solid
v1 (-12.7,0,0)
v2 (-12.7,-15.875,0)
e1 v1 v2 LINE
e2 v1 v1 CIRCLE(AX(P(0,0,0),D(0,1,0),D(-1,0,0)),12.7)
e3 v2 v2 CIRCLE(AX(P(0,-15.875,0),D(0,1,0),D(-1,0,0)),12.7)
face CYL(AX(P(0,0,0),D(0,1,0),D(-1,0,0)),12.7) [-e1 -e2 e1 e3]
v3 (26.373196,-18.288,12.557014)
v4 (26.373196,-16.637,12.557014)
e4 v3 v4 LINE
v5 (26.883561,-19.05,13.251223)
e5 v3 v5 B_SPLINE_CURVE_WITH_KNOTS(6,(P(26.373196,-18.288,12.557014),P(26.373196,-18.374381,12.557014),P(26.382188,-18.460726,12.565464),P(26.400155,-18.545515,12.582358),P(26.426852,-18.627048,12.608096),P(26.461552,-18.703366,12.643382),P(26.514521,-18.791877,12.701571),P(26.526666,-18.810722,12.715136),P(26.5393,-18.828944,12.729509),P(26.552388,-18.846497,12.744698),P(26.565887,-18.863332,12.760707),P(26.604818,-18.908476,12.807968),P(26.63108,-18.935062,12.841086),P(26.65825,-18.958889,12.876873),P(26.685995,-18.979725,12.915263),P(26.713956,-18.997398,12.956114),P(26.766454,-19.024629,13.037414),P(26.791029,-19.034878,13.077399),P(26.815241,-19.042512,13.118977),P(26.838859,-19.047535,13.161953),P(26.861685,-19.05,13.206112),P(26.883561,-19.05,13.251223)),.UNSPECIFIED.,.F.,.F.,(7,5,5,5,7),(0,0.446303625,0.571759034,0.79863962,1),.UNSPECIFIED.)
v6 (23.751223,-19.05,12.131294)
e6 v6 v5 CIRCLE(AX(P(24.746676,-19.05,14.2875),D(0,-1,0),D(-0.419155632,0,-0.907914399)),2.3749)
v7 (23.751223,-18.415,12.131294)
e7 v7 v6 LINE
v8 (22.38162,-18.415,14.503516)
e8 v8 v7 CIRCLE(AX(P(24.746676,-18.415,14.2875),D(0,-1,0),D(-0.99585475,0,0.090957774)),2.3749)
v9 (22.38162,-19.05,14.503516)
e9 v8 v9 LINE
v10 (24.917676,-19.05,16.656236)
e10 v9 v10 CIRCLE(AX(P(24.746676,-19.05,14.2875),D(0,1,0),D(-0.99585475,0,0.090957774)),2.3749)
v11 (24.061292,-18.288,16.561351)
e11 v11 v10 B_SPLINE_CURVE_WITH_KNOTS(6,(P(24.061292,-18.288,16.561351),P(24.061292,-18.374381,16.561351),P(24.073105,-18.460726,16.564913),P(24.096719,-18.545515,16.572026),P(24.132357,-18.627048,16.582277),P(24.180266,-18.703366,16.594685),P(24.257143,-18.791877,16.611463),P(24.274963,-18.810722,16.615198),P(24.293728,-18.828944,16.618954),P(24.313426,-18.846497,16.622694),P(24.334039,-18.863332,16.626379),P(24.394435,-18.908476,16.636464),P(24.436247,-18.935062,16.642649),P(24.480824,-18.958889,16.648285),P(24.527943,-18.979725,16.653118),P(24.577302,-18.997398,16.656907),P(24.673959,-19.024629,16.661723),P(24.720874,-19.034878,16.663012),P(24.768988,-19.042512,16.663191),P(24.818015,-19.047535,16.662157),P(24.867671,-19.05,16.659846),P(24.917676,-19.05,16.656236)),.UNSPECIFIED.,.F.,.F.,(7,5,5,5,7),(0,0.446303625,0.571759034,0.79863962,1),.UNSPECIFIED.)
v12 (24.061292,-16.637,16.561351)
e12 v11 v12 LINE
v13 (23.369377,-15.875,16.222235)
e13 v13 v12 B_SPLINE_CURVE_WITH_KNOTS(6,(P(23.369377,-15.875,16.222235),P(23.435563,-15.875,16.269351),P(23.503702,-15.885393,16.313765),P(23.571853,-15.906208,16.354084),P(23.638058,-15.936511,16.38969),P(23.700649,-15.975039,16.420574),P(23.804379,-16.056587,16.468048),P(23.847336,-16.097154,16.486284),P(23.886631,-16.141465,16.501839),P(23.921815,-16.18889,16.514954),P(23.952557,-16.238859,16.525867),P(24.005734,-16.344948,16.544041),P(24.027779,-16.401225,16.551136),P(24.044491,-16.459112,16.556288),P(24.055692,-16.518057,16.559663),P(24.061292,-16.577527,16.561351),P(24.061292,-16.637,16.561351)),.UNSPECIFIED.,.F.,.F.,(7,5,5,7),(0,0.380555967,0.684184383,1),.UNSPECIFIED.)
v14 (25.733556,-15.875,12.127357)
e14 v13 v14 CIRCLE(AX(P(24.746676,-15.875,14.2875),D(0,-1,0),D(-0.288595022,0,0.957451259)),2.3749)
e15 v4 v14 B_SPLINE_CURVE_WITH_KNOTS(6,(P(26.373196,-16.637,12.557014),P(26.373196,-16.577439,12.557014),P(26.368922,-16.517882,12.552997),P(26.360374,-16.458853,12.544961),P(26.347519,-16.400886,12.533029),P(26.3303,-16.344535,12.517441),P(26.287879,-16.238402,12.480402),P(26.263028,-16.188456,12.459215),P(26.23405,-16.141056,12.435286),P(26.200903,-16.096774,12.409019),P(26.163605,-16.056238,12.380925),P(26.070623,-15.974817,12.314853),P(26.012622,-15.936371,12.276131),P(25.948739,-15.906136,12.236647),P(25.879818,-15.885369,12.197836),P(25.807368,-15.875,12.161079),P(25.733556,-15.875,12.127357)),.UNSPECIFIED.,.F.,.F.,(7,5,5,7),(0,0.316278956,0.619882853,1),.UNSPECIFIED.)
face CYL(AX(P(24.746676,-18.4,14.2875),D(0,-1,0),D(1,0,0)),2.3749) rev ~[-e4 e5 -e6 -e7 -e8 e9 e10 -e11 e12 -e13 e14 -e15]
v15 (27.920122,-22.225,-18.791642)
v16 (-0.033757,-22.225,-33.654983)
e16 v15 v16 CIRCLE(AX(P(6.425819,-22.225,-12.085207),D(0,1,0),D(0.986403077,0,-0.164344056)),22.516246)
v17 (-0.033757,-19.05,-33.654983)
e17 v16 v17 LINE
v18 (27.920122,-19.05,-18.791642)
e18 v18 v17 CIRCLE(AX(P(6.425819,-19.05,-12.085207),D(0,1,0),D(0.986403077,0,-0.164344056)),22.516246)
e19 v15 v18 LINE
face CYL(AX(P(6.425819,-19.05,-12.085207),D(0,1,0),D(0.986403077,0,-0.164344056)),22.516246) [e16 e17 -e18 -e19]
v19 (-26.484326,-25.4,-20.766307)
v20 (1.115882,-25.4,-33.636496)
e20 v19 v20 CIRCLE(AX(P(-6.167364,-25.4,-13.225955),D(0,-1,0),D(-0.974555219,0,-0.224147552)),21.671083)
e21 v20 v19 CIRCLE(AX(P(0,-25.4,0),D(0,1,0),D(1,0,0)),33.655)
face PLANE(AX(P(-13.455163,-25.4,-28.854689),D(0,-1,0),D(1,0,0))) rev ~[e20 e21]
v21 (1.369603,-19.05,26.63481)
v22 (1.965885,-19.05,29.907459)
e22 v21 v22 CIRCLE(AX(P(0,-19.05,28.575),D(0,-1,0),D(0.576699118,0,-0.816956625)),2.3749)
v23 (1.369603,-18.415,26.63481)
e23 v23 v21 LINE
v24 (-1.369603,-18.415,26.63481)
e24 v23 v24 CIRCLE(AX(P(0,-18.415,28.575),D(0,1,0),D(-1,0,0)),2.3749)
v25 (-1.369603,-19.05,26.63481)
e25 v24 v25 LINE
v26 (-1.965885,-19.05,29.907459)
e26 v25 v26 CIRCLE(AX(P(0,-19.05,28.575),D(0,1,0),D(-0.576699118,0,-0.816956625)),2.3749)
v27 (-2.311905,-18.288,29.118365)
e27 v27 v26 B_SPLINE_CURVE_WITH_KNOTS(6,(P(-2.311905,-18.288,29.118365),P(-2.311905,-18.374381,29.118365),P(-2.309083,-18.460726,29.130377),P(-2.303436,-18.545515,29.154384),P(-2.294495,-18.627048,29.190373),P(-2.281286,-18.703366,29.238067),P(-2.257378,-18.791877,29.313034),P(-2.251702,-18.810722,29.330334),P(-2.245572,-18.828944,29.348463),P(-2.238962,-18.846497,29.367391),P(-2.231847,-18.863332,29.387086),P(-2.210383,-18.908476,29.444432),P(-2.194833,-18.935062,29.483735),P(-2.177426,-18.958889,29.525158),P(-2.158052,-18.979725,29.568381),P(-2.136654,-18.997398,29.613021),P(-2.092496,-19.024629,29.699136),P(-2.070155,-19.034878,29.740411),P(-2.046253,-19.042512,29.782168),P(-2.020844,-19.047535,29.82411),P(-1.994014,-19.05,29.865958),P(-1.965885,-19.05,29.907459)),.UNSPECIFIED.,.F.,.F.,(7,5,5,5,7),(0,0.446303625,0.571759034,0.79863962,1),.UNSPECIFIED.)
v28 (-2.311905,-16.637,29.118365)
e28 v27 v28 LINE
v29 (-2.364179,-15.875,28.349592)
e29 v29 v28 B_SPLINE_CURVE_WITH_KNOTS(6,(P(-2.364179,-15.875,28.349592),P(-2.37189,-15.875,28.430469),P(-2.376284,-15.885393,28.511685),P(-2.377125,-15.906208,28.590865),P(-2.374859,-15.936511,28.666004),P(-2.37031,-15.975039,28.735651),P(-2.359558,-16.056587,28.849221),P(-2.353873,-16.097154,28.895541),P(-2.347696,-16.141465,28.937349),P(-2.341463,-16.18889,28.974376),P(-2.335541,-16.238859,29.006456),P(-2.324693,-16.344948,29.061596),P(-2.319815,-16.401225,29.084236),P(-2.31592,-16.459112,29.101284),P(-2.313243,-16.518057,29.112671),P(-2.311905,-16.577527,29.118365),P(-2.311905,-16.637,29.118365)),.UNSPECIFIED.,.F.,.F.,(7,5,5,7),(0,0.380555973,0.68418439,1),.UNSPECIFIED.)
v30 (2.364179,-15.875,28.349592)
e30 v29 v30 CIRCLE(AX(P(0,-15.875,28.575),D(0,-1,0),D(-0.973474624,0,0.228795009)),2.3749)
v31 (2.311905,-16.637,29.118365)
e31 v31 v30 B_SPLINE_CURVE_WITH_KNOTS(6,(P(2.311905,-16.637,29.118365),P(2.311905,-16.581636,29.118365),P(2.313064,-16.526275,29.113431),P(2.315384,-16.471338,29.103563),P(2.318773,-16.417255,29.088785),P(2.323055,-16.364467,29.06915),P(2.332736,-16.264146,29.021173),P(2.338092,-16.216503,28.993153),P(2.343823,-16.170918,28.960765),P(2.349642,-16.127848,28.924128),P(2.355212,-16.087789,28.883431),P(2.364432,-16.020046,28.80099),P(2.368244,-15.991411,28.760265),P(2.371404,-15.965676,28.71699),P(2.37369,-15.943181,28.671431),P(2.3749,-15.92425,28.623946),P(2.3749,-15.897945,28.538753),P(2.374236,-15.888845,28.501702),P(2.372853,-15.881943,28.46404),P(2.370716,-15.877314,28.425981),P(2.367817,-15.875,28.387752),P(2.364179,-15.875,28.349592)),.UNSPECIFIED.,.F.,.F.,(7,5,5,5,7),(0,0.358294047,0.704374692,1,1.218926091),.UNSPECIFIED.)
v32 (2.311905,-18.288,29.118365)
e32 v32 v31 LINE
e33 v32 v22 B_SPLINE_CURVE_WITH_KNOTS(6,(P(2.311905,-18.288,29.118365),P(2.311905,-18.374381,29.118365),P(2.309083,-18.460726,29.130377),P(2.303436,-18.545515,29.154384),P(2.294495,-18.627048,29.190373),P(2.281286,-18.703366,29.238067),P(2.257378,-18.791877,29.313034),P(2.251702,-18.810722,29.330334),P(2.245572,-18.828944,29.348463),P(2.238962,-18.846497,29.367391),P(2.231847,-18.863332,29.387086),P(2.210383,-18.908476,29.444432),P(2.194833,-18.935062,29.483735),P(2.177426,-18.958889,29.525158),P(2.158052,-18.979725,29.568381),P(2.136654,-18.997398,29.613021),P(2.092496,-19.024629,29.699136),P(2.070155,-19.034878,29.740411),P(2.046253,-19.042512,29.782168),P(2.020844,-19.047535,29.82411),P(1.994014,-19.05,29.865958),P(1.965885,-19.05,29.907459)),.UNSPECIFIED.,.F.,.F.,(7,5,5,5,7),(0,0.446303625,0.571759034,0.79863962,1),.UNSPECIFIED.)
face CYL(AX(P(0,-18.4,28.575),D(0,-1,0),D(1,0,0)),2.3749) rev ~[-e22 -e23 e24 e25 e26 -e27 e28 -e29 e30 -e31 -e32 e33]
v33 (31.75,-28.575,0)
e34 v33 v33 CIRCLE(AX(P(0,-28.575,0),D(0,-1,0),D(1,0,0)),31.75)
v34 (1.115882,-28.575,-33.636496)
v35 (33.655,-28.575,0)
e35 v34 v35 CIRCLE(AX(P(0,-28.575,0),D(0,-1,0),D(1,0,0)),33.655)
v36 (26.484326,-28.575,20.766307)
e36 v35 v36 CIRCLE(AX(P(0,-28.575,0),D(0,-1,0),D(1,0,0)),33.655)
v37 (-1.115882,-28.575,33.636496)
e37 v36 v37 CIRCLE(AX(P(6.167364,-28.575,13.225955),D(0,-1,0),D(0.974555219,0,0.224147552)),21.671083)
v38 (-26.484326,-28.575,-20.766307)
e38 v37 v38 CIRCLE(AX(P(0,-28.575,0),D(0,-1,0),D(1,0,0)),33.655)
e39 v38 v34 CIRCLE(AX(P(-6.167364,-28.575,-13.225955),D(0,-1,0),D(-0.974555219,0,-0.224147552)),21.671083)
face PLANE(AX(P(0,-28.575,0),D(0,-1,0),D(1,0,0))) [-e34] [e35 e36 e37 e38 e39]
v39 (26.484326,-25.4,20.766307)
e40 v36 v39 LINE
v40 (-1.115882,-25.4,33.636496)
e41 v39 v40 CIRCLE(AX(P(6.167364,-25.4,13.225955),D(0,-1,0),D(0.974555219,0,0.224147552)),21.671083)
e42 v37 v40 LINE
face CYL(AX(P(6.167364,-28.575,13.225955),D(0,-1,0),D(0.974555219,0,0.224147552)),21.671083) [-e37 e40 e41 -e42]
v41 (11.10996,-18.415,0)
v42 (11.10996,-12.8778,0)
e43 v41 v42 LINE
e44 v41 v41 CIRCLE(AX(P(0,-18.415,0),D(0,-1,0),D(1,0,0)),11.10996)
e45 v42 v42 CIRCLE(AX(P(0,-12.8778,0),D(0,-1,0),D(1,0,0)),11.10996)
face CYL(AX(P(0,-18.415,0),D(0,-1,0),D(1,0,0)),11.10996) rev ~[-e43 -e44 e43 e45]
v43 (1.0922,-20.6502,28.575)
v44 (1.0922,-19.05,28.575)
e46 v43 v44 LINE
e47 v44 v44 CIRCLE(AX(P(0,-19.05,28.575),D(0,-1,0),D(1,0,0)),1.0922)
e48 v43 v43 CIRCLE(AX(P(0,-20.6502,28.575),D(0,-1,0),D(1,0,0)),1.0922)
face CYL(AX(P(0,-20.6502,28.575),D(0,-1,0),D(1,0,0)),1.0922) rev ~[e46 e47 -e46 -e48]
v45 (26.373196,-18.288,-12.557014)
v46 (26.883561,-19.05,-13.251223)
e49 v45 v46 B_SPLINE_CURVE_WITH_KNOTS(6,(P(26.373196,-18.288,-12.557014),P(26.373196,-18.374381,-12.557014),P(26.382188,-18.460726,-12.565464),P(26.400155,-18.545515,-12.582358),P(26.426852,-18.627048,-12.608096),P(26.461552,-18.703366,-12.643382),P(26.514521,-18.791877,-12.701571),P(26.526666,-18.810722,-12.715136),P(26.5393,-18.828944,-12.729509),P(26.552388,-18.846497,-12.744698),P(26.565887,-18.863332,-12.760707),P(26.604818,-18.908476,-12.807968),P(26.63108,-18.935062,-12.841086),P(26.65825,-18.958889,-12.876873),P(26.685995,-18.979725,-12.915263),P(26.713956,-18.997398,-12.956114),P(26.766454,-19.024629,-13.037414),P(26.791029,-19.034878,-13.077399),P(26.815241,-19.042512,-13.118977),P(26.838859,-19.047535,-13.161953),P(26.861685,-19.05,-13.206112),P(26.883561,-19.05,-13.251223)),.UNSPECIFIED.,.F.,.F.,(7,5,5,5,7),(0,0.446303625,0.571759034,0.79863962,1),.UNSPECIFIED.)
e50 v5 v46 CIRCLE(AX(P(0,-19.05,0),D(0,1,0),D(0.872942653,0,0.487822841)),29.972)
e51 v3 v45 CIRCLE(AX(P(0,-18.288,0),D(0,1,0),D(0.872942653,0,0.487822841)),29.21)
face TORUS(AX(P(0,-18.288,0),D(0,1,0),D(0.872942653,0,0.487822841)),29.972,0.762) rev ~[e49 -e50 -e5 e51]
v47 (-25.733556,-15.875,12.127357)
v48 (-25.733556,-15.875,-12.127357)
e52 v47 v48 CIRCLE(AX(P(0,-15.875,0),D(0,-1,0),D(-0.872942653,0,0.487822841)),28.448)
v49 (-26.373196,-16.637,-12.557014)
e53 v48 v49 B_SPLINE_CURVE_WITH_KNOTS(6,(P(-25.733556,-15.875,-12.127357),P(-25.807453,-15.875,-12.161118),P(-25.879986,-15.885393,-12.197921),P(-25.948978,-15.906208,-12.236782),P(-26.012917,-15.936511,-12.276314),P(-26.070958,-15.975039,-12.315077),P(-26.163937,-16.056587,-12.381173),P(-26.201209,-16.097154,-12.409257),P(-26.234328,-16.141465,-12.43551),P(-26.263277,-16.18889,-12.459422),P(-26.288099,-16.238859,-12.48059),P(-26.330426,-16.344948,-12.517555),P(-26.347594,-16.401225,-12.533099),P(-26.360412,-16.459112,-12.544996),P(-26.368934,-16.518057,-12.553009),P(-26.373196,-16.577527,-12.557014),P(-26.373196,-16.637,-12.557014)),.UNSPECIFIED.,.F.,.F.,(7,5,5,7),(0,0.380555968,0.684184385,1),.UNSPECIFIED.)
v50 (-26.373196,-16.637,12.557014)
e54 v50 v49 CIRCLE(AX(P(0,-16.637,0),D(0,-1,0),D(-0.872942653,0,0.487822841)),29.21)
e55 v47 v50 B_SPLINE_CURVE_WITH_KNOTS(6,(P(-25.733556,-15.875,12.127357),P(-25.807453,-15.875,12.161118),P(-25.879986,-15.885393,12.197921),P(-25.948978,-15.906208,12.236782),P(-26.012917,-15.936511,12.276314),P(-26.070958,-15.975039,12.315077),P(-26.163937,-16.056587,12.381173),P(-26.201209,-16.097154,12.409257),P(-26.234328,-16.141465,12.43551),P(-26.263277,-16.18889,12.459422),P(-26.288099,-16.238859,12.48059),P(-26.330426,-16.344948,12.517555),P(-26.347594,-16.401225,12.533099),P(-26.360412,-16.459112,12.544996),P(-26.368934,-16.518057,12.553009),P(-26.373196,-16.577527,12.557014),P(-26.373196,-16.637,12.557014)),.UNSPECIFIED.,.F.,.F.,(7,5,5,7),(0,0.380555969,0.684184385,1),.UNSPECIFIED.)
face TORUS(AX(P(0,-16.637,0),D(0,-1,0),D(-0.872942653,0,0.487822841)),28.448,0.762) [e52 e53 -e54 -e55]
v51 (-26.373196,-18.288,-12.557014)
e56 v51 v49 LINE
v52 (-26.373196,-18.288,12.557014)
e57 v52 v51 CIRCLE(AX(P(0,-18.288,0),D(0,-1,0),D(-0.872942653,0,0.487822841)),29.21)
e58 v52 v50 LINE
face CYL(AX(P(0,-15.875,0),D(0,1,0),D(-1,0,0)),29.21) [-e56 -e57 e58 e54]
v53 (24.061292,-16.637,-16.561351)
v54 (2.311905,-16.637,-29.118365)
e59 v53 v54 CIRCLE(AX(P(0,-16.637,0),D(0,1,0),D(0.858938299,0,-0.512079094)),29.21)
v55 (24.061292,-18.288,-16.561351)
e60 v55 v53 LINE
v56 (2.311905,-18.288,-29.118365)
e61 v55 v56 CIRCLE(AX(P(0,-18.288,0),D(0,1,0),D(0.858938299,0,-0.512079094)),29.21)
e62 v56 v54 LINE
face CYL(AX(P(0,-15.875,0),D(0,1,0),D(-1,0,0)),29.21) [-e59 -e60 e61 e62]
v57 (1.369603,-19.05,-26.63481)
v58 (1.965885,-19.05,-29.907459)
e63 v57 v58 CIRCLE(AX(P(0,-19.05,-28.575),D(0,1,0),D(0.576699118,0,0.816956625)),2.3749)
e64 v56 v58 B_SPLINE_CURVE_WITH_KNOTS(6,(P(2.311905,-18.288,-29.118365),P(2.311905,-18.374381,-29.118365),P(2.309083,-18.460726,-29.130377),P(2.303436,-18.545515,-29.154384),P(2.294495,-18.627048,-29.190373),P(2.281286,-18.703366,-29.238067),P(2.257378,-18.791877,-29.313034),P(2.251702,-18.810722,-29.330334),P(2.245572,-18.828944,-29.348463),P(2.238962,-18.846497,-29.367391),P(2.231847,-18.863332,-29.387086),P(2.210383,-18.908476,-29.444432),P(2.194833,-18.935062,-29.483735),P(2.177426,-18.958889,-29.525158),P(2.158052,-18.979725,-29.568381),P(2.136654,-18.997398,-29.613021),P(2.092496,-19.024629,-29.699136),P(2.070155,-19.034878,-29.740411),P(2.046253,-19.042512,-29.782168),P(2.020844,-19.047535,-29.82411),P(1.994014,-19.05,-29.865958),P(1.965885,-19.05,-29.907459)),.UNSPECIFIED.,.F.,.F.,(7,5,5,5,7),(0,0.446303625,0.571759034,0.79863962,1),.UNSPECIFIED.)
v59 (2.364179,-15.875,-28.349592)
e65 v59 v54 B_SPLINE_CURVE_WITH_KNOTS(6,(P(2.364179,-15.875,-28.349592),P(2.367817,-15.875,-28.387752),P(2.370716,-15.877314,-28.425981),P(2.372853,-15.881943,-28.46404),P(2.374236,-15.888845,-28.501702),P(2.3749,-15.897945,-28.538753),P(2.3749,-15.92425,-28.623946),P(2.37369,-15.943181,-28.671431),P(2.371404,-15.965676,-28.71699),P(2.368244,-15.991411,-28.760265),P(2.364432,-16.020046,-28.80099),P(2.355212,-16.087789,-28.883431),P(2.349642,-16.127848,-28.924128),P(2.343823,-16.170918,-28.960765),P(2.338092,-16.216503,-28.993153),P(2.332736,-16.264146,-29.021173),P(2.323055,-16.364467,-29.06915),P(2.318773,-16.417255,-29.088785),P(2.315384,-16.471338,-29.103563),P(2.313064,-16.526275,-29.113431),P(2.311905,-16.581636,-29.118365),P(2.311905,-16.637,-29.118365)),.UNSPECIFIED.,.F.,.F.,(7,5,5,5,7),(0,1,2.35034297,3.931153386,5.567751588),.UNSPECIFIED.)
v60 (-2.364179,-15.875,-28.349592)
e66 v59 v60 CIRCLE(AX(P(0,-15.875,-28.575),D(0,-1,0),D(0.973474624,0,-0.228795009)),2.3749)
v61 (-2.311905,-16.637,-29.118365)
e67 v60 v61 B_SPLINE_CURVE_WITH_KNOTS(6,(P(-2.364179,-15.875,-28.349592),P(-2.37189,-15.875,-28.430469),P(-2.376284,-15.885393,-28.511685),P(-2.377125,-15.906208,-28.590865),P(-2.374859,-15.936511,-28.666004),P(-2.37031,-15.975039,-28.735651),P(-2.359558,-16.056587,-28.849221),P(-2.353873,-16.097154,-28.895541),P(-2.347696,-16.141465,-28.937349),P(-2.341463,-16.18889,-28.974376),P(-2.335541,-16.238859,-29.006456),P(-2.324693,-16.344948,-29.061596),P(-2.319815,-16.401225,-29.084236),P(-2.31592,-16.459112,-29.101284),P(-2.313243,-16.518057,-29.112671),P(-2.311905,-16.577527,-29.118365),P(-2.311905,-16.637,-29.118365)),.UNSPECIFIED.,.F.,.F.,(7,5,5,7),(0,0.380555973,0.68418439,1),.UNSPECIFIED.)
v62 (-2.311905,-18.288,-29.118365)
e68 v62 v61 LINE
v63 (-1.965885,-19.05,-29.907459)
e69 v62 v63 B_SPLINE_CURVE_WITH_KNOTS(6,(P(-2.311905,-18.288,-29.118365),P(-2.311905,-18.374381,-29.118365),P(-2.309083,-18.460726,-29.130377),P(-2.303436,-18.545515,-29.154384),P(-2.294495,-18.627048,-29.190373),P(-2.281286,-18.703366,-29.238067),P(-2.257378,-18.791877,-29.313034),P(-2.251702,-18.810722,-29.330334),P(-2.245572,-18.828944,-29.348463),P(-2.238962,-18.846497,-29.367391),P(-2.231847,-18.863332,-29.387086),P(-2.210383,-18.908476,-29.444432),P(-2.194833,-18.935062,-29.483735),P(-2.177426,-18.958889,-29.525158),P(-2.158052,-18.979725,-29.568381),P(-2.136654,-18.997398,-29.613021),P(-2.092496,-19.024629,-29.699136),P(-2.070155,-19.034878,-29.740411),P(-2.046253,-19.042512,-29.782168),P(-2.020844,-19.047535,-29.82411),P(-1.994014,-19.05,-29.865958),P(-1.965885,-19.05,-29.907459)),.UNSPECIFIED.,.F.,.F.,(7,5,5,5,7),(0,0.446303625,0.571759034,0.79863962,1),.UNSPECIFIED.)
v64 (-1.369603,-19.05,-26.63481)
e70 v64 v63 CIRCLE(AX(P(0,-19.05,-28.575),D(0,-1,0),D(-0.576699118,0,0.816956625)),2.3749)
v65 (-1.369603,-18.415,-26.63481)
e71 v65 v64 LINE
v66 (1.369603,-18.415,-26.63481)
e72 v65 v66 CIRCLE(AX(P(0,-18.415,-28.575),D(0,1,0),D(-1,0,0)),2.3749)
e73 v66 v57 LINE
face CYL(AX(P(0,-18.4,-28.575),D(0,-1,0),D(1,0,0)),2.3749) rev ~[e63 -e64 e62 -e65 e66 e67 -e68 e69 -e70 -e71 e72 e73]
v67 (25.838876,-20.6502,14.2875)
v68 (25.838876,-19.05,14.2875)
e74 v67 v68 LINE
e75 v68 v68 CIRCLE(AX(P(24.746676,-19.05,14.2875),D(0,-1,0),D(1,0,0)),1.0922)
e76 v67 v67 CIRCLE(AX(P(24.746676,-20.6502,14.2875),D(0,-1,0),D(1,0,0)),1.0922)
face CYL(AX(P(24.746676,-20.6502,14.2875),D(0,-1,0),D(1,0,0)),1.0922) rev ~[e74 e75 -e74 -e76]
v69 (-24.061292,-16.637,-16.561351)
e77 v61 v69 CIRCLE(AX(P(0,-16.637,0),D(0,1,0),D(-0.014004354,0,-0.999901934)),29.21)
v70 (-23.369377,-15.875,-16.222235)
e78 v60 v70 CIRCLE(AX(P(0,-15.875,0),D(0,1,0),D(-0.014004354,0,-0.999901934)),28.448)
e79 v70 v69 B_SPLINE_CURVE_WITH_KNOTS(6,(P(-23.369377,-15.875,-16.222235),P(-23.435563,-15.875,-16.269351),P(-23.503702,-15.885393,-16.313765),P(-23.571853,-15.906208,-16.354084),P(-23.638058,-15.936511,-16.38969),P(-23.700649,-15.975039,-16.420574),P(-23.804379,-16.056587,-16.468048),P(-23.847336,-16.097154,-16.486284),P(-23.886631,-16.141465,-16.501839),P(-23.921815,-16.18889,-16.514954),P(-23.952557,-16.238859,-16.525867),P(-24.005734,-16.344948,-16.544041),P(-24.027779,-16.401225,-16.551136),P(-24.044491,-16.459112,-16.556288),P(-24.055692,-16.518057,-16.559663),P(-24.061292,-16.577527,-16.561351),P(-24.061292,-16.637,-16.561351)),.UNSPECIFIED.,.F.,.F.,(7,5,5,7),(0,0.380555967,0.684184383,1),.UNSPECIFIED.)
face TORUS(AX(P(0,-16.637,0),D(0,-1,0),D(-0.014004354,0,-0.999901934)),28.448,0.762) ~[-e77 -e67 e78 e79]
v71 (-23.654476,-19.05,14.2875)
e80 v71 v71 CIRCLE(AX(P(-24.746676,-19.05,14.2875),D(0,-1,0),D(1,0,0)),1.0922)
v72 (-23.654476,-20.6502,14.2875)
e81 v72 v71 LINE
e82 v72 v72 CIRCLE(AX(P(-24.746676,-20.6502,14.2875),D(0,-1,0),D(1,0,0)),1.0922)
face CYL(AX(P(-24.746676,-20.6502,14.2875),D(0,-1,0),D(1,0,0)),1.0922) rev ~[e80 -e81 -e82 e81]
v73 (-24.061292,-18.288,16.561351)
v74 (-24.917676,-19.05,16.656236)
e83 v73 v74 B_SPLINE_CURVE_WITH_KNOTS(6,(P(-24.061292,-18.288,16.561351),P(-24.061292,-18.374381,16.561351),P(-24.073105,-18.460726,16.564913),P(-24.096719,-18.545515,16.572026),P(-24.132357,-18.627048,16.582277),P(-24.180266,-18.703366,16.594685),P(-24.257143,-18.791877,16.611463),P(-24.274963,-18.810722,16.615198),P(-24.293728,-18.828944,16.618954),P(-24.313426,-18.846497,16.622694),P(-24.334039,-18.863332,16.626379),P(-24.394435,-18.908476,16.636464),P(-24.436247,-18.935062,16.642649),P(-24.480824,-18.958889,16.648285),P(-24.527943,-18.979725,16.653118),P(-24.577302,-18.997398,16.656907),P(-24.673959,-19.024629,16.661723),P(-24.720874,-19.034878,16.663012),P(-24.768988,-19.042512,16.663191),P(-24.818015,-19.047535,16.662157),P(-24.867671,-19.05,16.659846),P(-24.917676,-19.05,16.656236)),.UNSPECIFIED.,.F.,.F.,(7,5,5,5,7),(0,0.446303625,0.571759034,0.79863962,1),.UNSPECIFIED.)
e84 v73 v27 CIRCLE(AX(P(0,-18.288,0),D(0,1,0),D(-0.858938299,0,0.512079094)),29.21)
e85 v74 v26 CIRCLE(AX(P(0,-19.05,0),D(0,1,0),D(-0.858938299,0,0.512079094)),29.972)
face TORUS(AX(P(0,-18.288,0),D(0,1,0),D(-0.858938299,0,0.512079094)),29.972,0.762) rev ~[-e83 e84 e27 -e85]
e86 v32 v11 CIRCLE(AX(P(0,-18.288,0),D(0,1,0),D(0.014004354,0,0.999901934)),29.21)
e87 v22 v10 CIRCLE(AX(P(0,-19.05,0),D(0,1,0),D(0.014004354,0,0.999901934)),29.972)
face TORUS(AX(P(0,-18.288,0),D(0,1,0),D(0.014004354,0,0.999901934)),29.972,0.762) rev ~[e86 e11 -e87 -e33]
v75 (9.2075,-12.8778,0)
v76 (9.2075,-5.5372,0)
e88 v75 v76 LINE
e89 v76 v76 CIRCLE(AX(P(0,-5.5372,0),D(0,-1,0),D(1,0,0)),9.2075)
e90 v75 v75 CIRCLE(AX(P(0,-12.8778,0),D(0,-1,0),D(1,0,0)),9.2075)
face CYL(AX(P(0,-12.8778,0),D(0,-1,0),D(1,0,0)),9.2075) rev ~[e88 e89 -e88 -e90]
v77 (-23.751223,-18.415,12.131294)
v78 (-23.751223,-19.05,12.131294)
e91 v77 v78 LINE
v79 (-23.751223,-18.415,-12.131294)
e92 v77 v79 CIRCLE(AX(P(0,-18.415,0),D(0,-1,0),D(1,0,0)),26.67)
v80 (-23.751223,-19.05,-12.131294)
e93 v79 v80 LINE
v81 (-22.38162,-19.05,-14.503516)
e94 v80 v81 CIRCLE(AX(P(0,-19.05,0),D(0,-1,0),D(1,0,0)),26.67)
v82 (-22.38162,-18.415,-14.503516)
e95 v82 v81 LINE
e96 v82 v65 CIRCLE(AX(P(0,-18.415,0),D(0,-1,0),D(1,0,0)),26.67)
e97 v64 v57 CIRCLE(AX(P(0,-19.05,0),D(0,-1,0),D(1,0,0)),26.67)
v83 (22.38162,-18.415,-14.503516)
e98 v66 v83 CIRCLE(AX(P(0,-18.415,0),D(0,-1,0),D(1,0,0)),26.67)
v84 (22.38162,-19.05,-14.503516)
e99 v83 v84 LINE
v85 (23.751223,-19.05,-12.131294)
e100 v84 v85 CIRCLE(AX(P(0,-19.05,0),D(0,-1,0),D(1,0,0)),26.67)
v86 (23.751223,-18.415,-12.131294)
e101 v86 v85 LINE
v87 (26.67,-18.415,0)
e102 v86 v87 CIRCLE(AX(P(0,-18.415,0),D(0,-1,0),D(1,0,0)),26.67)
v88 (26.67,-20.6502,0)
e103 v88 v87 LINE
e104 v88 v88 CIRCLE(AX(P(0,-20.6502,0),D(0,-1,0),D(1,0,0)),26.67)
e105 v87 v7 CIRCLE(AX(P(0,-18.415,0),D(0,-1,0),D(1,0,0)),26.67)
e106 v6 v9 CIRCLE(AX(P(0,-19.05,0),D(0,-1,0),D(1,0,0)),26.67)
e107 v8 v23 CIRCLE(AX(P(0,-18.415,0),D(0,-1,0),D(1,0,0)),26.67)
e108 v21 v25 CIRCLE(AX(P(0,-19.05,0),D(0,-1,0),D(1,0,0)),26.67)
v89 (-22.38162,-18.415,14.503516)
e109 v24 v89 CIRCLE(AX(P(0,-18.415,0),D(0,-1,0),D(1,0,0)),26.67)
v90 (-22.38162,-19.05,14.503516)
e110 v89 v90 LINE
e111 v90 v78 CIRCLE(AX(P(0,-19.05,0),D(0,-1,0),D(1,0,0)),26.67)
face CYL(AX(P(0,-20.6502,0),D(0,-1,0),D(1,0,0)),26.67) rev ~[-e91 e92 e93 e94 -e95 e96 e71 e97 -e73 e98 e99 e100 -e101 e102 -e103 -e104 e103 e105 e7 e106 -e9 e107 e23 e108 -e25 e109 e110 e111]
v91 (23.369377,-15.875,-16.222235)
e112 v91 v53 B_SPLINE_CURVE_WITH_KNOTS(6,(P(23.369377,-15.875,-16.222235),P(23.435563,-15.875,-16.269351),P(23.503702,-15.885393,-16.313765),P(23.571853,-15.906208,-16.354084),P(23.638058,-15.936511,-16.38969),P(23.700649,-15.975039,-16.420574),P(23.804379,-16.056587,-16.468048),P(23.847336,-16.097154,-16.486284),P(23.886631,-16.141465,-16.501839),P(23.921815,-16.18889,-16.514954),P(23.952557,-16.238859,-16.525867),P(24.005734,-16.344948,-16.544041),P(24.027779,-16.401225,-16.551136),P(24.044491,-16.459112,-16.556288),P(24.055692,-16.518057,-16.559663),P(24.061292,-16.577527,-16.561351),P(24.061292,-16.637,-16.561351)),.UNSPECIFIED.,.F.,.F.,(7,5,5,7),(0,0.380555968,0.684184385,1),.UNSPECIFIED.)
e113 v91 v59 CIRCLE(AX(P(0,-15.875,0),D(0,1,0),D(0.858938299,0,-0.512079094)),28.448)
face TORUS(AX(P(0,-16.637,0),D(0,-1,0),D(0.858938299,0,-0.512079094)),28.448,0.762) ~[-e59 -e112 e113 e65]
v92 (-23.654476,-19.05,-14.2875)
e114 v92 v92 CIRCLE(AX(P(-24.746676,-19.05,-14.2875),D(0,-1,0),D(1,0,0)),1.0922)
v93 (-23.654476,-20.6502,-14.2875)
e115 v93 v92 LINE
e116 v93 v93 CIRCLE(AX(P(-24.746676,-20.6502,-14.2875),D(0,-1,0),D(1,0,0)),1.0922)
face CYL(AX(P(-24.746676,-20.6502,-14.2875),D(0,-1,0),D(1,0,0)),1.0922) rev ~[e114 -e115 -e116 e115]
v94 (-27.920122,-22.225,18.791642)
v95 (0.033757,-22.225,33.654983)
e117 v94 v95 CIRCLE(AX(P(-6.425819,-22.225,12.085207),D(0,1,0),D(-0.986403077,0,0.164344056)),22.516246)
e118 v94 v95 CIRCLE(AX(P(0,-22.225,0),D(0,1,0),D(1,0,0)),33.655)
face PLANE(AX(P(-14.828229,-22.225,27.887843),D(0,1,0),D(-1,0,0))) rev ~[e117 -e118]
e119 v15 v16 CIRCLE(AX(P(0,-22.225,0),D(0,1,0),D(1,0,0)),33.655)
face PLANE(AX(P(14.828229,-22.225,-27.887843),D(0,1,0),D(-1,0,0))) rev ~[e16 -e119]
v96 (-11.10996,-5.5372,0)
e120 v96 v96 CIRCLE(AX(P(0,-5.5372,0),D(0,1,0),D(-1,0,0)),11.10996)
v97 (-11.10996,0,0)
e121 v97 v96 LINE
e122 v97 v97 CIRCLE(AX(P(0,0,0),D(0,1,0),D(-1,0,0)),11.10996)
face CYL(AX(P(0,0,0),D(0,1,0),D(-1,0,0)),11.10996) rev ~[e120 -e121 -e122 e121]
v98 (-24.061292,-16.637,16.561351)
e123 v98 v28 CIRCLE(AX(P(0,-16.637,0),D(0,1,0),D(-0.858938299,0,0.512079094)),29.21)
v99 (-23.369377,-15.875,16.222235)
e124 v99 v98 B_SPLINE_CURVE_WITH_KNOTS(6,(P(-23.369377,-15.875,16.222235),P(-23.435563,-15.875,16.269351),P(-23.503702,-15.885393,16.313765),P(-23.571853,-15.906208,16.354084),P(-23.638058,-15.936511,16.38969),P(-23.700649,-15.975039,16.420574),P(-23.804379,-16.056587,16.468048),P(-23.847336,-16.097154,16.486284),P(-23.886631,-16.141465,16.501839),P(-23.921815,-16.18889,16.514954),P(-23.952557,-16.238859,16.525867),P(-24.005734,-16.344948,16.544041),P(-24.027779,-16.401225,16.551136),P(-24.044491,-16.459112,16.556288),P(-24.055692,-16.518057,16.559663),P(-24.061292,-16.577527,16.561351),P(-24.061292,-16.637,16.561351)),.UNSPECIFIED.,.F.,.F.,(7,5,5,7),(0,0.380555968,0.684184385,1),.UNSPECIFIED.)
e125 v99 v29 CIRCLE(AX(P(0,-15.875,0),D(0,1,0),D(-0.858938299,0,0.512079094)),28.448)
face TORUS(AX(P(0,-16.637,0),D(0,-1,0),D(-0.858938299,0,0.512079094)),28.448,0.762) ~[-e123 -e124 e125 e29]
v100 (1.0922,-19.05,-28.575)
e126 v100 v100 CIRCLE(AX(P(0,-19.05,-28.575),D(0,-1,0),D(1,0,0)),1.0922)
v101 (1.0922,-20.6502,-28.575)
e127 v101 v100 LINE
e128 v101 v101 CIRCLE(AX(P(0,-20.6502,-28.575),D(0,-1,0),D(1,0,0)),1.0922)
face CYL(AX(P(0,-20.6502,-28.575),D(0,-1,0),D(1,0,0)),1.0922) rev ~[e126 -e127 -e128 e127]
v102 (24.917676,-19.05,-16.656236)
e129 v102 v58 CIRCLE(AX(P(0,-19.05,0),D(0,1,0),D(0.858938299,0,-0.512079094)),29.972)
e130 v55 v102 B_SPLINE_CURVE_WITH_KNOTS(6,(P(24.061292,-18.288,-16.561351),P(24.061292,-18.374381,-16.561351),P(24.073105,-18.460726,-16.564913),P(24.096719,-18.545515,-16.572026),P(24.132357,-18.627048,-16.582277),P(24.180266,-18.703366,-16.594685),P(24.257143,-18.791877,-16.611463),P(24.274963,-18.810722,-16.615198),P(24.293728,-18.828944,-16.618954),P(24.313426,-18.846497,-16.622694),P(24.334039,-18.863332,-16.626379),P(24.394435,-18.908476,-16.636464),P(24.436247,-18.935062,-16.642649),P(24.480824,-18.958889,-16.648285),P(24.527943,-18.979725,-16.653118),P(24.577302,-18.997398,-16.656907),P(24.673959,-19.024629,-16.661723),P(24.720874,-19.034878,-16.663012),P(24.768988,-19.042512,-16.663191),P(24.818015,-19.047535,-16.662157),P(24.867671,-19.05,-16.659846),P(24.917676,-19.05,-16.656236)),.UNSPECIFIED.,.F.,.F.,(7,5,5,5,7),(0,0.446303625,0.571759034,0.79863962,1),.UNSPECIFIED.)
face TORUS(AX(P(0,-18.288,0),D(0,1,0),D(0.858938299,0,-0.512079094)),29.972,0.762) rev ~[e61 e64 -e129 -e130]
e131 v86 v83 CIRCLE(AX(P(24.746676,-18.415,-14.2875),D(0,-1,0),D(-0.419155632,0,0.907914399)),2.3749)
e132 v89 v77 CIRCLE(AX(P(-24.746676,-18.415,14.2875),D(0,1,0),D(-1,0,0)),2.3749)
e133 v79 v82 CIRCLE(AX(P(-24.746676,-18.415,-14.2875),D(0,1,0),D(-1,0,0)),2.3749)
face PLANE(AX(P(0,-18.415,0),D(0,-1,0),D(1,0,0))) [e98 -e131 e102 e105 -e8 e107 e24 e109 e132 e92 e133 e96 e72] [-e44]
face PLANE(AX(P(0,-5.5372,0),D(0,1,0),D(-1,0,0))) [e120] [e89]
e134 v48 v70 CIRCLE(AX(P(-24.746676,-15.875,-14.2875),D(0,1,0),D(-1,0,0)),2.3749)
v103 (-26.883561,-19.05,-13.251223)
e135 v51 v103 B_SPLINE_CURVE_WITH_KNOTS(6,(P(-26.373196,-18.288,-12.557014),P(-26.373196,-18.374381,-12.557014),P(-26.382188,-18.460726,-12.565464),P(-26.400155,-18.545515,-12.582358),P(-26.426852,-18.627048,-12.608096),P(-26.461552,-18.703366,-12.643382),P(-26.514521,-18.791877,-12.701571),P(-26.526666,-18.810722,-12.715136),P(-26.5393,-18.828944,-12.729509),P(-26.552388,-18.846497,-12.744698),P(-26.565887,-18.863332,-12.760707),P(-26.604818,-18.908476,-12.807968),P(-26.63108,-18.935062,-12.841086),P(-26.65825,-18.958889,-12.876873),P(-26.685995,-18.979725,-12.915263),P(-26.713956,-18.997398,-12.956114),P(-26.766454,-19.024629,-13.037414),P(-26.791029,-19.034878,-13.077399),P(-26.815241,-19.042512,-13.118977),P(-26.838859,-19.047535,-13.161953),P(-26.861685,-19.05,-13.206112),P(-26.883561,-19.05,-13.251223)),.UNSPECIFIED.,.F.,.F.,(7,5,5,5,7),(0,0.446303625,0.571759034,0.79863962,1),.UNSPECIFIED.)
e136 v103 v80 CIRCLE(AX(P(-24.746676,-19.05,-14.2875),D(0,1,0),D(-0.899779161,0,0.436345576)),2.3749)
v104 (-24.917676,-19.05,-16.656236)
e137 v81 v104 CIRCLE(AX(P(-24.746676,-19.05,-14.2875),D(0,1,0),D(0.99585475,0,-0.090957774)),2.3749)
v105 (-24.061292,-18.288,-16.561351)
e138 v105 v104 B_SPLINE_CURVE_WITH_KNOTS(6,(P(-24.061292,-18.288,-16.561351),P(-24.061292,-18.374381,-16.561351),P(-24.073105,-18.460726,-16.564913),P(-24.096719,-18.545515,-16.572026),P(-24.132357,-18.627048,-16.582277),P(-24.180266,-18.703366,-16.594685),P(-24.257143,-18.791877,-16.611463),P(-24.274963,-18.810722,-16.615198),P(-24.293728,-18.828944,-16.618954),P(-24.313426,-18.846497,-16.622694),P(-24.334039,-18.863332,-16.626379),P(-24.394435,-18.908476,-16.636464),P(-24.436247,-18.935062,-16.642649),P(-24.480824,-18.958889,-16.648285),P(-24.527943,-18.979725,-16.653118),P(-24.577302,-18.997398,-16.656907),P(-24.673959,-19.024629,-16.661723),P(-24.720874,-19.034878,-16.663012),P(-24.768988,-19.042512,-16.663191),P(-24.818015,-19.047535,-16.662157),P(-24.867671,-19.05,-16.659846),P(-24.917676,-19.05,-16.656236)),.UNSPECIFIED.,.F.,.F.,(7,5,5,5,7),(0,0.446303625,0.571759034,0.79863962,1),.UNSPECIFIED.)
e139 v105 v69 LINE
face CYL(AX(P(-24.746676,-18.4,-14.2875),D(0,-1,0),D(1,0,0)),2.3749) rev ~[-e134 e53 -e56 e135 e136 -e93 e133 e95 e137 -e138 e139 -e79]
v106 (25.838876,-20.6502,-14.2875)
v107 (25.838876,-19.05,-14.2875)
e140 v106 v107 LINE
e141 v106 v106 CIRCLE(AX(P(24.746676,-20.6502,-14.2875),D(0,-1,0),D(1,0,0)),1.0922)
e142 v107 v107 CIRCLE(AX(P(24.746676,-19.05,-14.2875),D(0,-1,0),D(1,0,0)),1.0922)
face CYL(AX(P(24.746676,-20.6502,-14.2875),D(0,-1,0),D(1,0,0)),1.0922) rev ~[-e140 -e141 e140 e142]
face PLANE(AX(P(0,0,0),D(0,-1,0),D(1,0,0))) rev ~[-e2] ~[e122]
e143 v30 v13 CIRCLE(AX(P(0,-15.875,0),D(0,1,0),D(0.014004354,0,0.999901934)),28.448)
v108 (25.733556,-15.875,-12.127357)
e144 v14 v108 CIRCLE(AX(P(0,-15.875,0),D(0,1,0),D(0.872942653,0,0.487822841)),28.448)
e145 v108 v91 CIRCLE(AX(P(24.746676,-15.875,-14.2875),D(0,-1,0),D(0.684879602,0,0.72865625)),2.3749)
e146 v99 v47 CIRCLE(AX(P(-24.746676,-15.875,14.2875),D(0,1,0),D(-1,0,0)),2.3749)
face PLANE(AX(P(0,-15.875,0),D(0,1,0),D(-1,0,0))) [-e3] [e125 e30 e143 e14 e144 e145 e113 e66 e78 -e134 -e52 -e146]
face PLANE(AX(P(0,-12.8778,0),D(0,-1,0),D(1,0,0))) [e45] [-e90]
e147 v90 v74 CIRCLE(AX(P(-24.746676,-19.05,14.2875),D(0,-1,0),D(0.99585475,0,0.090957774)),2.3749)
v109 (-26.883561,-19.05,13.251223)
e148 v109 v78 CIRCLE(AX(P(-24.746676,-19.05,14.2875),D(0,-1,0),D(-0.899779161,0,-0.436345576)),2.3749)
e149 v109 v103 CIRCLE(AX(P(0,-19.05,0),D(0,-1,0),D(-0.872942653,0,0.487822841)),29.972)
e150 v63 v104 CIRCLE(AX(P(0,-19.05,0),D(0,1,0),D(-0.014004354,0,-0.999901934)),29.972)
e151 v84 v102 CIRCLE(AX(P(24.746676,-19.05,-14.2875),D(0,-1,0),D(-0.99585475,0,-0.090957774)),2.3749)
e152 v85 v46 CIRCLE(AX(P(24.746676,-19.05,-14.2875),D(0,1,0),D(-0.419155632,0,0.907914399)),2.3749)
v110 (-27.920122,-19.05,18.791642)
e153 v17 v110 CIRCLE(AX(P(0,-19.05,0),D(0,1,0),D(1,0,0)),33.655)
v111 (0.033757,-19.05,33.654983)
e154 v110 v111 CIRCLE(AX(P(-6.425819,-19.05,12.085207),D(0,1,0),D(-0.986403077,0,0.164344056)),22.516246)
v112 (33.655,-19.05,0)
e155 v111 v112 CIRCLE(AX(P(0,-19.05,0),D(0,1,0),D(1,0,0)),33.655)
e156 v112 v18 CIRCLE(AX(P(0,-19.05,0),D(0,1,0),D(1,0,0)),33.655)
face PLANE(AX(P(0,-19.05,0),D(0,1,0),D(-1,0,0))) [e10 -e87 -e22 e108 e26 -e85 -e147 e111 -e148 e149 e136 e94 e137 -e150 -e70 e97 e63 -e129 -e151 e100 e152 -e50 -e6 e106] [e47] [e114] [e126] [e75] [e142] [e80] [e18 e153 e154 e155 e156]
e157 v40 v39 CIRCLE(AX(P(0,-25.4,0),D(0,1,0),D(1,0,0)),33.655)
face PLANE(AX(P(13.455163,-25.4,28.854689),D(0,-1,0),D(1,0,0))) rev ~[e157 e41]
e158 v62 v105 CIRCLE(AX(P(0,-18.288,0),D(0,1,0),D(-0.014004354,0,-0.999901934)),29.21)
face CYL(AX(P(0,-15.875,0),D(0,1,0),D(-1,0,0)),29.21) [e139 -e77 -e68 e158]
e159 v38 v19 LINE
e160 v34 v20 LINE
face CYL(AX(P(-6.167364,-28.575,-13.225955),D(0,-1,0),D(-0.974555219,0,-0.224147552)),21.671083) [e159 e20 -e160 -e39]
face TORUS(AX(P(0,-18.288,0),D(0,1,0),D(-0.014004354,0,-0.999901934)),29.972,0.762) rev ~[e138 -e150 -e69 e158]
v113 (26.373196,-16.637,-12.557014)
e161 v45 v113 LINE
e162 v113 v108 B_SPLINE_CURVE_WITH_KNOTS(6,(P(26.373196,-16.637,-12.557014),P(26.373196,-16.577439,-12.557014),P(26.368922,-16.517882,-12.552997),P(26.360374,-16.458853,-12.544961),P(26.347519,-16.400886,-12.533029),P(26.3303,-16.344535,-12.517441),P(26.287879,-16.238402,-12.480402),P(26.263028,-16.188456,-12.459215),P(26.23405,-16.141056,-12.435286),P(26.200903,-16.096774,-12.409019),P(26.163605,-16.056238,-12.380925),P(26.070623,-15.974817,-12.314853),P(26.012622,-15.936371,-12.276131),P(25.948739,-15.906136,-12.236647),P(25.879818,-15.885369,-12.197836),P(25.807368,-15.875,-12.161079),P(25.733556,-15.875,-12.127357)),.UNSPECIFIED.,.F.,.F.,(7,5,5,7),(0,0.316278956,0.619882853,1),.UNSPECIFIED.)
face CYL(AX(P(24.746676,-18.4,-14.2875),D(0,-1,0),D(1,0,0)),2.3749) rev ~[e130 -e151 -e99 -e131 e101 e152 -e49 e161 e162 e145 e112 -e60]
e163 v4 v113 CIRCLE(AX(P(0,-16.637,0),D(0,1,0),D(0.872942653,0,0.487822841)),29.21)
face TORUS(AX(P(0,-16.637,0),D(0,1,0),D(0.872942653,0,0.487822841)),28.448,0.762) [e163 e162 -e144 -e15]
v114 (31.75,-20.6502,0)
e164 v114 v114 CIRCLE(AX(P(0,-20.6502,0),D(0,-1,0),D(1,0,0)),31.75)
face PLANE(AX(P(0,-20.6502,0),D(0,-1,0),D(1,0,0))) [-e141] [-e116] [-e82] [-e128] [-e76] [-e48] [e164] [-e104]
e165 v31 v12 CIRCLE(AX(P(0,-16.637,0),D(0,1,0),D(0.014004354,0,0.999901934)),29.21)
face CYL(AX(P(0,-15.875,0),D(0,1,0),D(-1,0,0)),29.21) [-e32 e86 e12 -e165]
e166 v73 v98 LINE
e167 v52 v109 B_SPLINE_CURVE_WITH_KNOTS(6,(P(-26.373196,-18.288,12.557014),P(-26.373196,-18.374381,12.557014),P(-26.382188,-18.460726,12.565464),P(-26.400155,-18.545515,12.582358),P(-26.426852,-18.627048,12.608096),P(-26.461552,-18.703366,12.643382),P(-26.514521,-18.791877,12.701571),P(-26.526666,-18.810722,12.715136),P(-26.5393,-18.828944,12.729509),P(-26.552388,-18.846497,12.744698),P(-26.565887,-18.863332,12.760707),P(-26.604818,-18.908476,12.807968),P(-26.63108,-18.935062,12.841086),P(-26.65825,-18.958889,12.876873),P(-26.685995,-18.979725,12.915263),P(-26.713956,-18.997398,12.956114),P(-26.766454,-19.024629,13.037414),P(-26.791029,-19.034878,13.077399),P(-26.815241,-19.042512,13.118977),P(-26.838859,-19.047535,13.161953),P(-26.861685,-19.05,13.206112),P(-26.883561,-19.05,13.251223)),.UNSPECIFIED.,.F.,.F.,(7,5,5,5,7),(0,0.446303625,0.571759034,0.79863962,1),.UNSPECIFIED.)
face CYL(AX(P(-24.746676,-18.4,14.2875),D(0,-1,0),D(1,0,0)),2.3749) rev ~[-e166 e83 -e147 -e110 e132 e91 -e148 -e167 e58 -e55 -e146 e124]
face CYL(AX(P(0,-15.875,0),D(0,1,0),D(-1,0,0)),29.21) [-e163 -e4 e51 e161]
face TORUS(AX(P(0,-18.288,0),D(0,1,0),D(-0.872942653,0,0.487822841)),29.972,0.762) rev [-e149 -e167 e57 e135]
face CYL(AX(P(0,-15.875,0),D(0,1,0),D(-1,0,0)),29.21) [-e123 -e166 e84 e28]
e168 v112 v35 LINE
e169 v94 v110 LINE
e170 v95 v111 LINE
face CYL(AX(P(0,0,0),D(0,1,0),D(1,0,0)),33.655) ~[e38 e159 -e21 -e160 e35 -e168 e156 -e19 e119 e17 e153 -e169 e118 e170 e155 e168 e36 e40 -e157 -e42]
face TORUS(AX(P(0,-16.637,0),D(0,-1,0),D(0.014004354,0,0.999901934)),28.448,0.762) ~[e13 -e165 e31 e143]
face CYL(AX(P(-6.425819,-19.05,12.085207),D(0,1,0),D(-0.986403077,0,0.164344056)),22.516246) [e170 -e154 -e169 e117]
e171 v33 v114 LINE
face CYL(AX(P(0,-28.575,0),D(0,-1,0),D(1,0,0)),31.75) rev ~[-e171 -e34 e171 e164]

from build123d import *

# Parameters (mm, degrees)
F0_R          = 33.655
F1_DEPTH      = 28.575
F2_R          = 43.8466719597
F2_R_2        = 12.7
F3_DEPTH      = 15.875
F4_R          = 31.75
F5_DEPTH      = 7.9248
F6_R          = 26.67
F7_DEPTH      = 2.2352
F8_R          = 11.10996
F9_DEPTH      = 5.5372
F10_R         = 9.2075
F11_DEPTH     = 25.4
F12_R         = 11.10996
F13_DEPTH     = 5.5372
F14_R         = 43.7649146766
F14_R_2       = 29.21
F15_DEPTH     = 3.175
F16_R         = 1.0922
F17_DEPTH     = 25.4
F18_R         = 2.3749
F19_DEPTH     = 3.175
F20_T4_ANGLE  = 58.3951667525
F20_S5_R      = 2.3749
F20_T6_DEPTH  = 18
F20_S7_R      = 2.3749
F20_T8_DEPTH  = 18
F20_T12_ANGLE = 58.3951667525
F20_S13_R     = 2.3749
F20_T14_DEPTH = 18
F20_S15_R     = 2.3749
F20_T16_DEPTH = 18
F20_T20_ANGLE = 58.3951667525
F20_S21_R     = 2.3749
F20_T22_DEPTH = 18
F20_S23_R     = 2.3749
F20_T24_DEPTH = 18
F20_T28_ANGLE = 58.3951667525
F20_S29_R     = 2.3749
F20_T30_DEPTH = 18
F20_S31_R     = 2.3749
F20_T32_DEPTH = 18
F20_T36_ANGLE = 58.3951667525
F20_S37_R     = 2.3749
F20_T38_DEPTH = 18
F20_S39_R     = 2.3749
F20_T40_DEPTH = 18
F20_T44_ANGLE = 58.3951667525
F20_S45_R     = 2.3749
F20_T46_DEPTH = 18
F20_S47_R     = 2.3749
F20_T48_DEPTH = 18
F20_T50_ANGLE = 58.3951667525
F20_T52_ANGLE = 58.3951667525
F20_T54_ANGLE = 58.3951667525
F20_T56_ANGLE = 58.3951667525
F20_T58_ANGLE = 58.3951667525
F20_T60_ANGLE = 58.3951667525
F22_DEPTH     = 3.175
F24_DEPTH     = 3.175


# Not quite as in the source:
# - a fillet or chamfer that OpenCascade refuses, or shapes differently, is made with other operations: its cross-section is extruded or revolved along the edge and cut away or added


with BuildPart() as f1:
    # F0 (on Front) → F1 (new body)
    with BuildSketch(Plane.XZ):
        Circle(F0_R)
    extrude(amount=F1_DEPTH)

    # F2 (on face) → F3 (cut)
    with BuildSketch(Plane(origin=(0, 0, 0), x_dir=(-1, 0, 0), z_dir=(0, 1, 0))):
        Circle(F2_R)
        Circle(F2_R_2, mode=Mode.SUBTRACT)
    extrude(amount=-F3_DEPTH, mode=Mode.SUBTRACT)

    # F4 (on face) → F5 (cut)
    with BuildSketch(Plane.XZ.offset(28.575)):
        Circle(F4_R)
    extrude(amount=-F5_DEPTH, mode=Mode.SUBTRACT)

    # F6 (on face) → F7 (cut)
    with BuildSketch(Plane.XZ.offset(20.6502)):
        Circle(F6_R)
    extrude(amount=-F7_DEPTH, mode=Mode.SUBTRACT)

    # F8 (on face) → F9 (cut)
    with BuildSketch(Plane.XZ.offset(18.415)):
        Circle(F8_R)
    extrude(amount=-F9_DEPTH, mode=Mode.SUBTRACT)

    # F10 (on face) → F11 (cut)
    with BuildSketch(Plane.XZ.offset(12.8778)):
        Circle(F10_R)
    extrude(amount=-F11_DEPTH, mode=Mode.SUBTRACT)

    # F12 (on face) → F13 (cut)
    with BuildSketch(Plane(origin=(0, 0, 0), x_dir=(-1, 0, 0), z_dir=(0, 1, 0))):
        Circle(F12_R)
    extrude(amount=-F13_DEPTH, mode=Mode.SUBTRACT)

    # F14 (on face) → F15 (cut)
    with BuildSketch(Plane(origin=(0, -15.875, 0), x_dir=(-1, 0, 0), z_dir=(0, 1, 0))):
        Circle(F14_R)
        Circle(F14_R_2, mode=Mode.SUBTRACT)
    extrude(amount=-F15_DEPTH, mode=Mode.SUBTRACT)

    # F16 (on face) → F17 (cut)
    with BuildSketch(Plane.XZ.offset(20.6502)):
        with Locations((0, 28.575)):
            Circle(F16_R)
        with Locations((-24.7466759131, 14.2875)):
            Circle(F16_R)
        with Locations((-24.7466759131, -14.2875)):
            Circle(F16_R)
        with Locations((0, -28.575)):
            Circle(F16_R)
        with Locations((24.7466759131, -14.2875)):
            Circle(F16_R)
        with Locations((24.7466759131, 14.2875)):
            Circle(F16_R)
    extrude(amount=-F17_DEPTH, mode=Mode.SUBTRACT)

    # F18 (on face) → F19 (cut)
    with BuildSketch(Plane(origin=(0, -15.875, 0), x_dir=(-1, 0, 0), z_dir=(0, 1, 0))):
        with Locations((0, 28.575)):
            Circle(F18_R)
        with Locations((-24.7466759131, 14.2875)):
            Circle(F18_R)
        with Locations((-24.7466759131, -14.2875)):
            Circle(F18_R)
        with Locations((0, -28.575)):
            Circle(F18_R)
        with Locations((24.7466759131, -14.2875)):
            Circle(F18_R)
        with Locations((24.7466759131, 14.2875)):
            Circle(F18_R)
    extrude(amount=-F19_DEPTH, mode=Mode.SUBTRACT)

    # F20: fillet of radius 0.762 on 12 edges, made by hand


with BuildPart() as f20_tool2:
    # F20_s3 → F20_t4 (revolve)
    with BuildSketch(Plane(origin=(0, 0, 0), x_dir=(0, 1, 0), z_dir=(-0.9999019342, 0, 0.0140043543))):
        with BuildLine():
            ThreePointArc((-18.288, -29.21), (-18.8268153673, -29.4331846327), (-19.05, -29.972))
            Line((-19.05, -29.972), (-19.05, -29.21))
            Line((-19.05, -29.21), (-18.288, -29.21))
        make_face()
    revolve(axis=Axis((0, -19.05, 0), (0, 1, 0)), revolution_arc=F20_T4_ANGLE)

    # F20_s5 → F20_t6 (cut, symmetric)
    with BuildSketch(Plane.XZ.offset(18.4)):
        with Locations((24.7466759131, 14.2875)):
            Circle(F20_S5_R)
    extrude(amount=F20_T6_DEPTH, both=True, mode=Mode.SUBTRACT)

    # F20_s7 → F20_t8 (cut, symmetric)
    with BuildSketch(Plane.XZ.offset(18.4)):
        with Locations((0, 28.575)):
            Circle(F20_S7_R)
    extrude(amount=F20_T8_DEPTH, both=True, mode=Mode.SUBTRACT)


with BuildPart() as f1_1:
    add(f1.part)

    # F20_t1: union F20_tool2
    add(f20_tool2.part)


with BuildPart() as f20_tool10:
    # F20_s11 → F20_t12 (revolve)
    with BuildSketch(Plane(origin=(0, 0, 0), x_dir=(0, 1, 0), z_dir=(-0.4878228406, 0, 0.8729426535))):
        with BuildLine():
            ThreePointArc((-18.288, -29.21), (-18.8268153673, -29.4331846327), (-19.05, -29.972))
            Line((-19.05, -29.972), (-19.05, -29.21))
            Line((-19.05, -29.21), (-18.288, -29.21))
        make_face()
    revolve(axis=Axis((0, -19.05, 0), (0, 1, 0)), revolution_arc=F20_T12_ANGLE)

    # F20_s13 → F20_t14 (cut, symmetric)
    with BuildSketch(Plane.XZ.offset(18.4)):
        with Locations((24.7466759131, 14.2875)):
            Circle(F20_S13_R)
    extrude(amount=F20_T14_DEPTH, both=True, mode=Mode.SUBTRACT)

    # F20_s15 → F20_t16 (cut, symmetric)
    with BuildSketch(Plane.XZ.offset(18.4)):
        with Locations((24.7466759131, -14.2875)):
            Circle(F20_S15_R)
    extrude(amount=F20_T16_DEPTH, both=True, mode=Mode.SUBTRACT)


with BuildPart() as f1_2:
    add(f1_1.part)

    # F20_t9: union F20_tool10
    add(f20_tool10.part)


with BuildPart() as f20_tool18:
    # F20_s19 → F20_t20 (revolve)
    with BuildSketch(Plane(origin=(0, 0, 0), x_dir=(0, 1, 0), z_dir=(0.5120790937, 0, 0.8589382992))):
        with BuildLine():
            ThreePointArc((-18.288, -29.21), (-18.8268153673, -29.4331846327), (-19.05, -29.972))
            Line((-19.05, -29.972), (-19.05, -29.21))
            Line((-19.05, -29.21), (-18.288, -29.21))
        make_face()
    revolve(axis=Axis((0, -19.05, 0), (0, 1, 0)), revolution_arc=F20_T20_ANGLE)

    # F20_s21 → F20_t22 (cut, symmetric)
    with BuildSketch(Plane.XZ.offset(18.4)):
        with Locations((24.7466759131, -14.2875)):
            Circle(F20_S21_R)
    extrude(amount=F20_T22_DEPTH, both=True, mode=Mode.SUBTRACT)

    # F20_s23 → F20_t24 (cut, symmetric)
    with BuildSketch(Plane.XZ.offset(18.4)):
        with Locations((0, -28.575)):
            Circle(F20_S23_R)
    extrude(amount=F20_T24_DEPTH, both=True, mode=Mode.SUBTRACT)


with BuildPart() as f1_3:
    add(f1_2.part)

    # F20_t17: union F20_tool18
    add(f20_tool18.part)


with BuildPart() as f20_tool26:
    # F20_s27 → F20_t28 (revolve)
    with BuildSketch(Plane(origin=(0, 0, 0), x_dir=(0, 1, 0), z_dir=(0.4878228406, 0, 0.8729426535))):
        with BuildLine():
            ThreePointArc((-18.288, 29.21), (-18.8268153673, 29.4331846327), (-19.05, 29.972))
            Line((-19.05, 29.972), (-19.05, 29.21))
            Line((-19.05, 29.21), (-18.288, 29.21))
        make_face()
    revolve(axis=Axis((0, -19.05, 0), (0, -1, 0)), revolution_arc=F20_T28_ANGLE)

    # F20_s29 → F20_t30 (cut, symmetric)
    with BuildSketch(Plane.XZ.offset(18.4)):
        with Locations((-24.7466759131, 14.2875)):
            Circle(F20_S29_R)
    extrude(amount=F20_T30_DEPTH, both=True, mode=Mode.SUBTRACT)

    # F20_s31 → F20_t32 (cut, symmetric)
    with BuildSketch(Plane.XZ.offset(18.4)):
        with Locations((-24.7466759131, -14.2875)):
            Circle(F20_S31_R)
    extrude(amount=F20_T32_DEPTH, both=True, mode=Mode.SUBTRACT)


with BuildPart() as f1_4:
    add(f1_3.part)

    # F20_t25: union F20_tool26
    add(f20_tool26.part)


with BuildPart() as f20_tool34:
    # F20_s35 → F20_t36 (revolve)
    with BuildSketch(Plane(origin=(0, 0, 0), x_dir=(0, 1, 0), z_dir=(-0.5120790937, 0, -0.8589382992))):
        with BuildLine():
            ThreePointArc((-18.288, -29.21), (-18.8268153673, -29.4331846327), (-19.05, -29.972))
            Line((-19.05, -29.972), (-19.05, -29.21))
            Line((-19.05, -29.21), (-18.288, -29.21))
        make_face()
    revolve(axis=Axis((0, -19.05, 0), (0, 1, 0)), revolution_arc=F20_T36_ANGLE)

    # F20_s37 → F20_t38 (cut, symmetric)
    with BuildSketch(Plane.XZ.offset(18.4)):
        with Locations((0, 28.575)):
            Circle(F20_S37_R)
    extrude(amount=F20_T38_DEPTH, both=True, mode=Mode.SUBTRACT)

    # F20_s39 → F20_t40 (cut, symmetric)
    with BuildSketch(Plane.XZ.offset(18.4)):
        with Locations((-24.7466759131, 14.2875)):
            Circle(F20_S39_R)
    extrude(amount=F20_T40_DEPTH, both=True, mode=Mode.SUBTRACT)


with BuildPart() as f1_5:
    add(f1_4.part)

    # F20_t33: union F20_tool34
    add(f20_tool34.part)


with BuildPart() as f20_tool42:
    # F20_s43 → F20_t44 (revolve)
    with BuildSketch(Plane(origin=(0, 0, 0), x_dir=(0, 1, 0), z_dir=(0.9999019342, 0, -0.0140043543))):
        with BuildLine():
            ThreePointArc((-18.288, -29.21), (-18.8268153673, -29.4331846327), (-19.05, -29.972))
            Line((-19.05, -29.972), (-19.05, -29.21))
            Line((-19.05, -29.21), (-18.288, -29.21))
        make_face()
    revolve(axis=Axis((0, -19.05, 0), (0, 1, 0)), revolution_arc=F20_T44_ANGLE)

    # F20_s45 → F20_t46 (cut, symmetric)
    with BuildSketch(Plane.XZ.offset(18.4)):
        with Locations((0, -28.575)):
            Circle(F20_S45_R)
    extrude(amount=F20_T46_DEPTH, both=True, mode=Mode.SUBTRACT)

    # F20_s47 → F20_t48 (cut, symmetric)
    with BuildSketch(Plane.XZ.offset(18.4)):
        with Locations((-24.7466759131, -14.2875)):
            Circle(F20_S47_R)
    extrude(amount=F20_T48_DEPTH, both=True, mode=Mode.SUBTRACT)


with BuildPart() as f1_6:
    add(f1_5.part)

    # F20_t41: union F20_tool42
    add(f20_tool42.part)

    # F20_s49 → F20_t50 (revolve, cut)
    with BuildSketch(Plane(origin=(0, 0, 0), x_dir=(0, 1, 0), z_dir=(0.9999019342, 0, -0.0140043543))):
        with BuildLine():
            ThreePointArc((-15.875, -28.448), (-16.0981846327, -28.9868153673), (-16.637, -29.21))
            Line((-16.637, -29.21), (-15.875, -29.21))
            Line((-15.875, -29.21), (-15.875, -28.448))
        make_face()
    revolve(axis=Axis((0, -15.875, 0), (0, 1, 0)), revolution_arc=F20_T50_ANGLE, mode=Mode.SUBTRACT)

    # F20_s51 → F20_t52 (revolve, cut)
    with BuildSketch(Plane(origin=(0, 0, 0), x_dir=(0, 1, 0), z_dir=(0.4878228406, 0, 0.8729426535))):
        with BuildLine():
            ThreePointArc((-15.875, 28.448), (-16.0981846327, 28.9868153673), (-16.637, 29.21))
            Line((-16.637, 29.21), (-15.875, 29.21))
            Line((-15.875, 29.21), (-15.875, 28.448))
        make_face()
    revolve(axis=Axis((0, -15.875, 0), (0, -1, 0)), revolution_arc=F20_T52_ANGLE, mode=Mode.SUBTRACT)

    # F20_s53 → F20_t54 (revolve, cut)
    with BuildSketch(Plane(origin=(0, 0, 0), x_dir=(0, 1, 0), z_dir=(0.5120790937, 0, 0.8589382992))):
        with BuildLine():
            ThreePointArc((-15.875, -28.448), (-16.0981846327, -28.9868153673), (-16.637, -29.21))
            Line((-16.637, -29.21), (-15.875, -29.21))
            Line((-15.875, -29.21), (-15.875, -28.448))
        make_face()
    revolve(axis=Axis((0, -15.875, 0), (0, 1, 0)), revolution_arc=F20_T54_ANGLE, mode=Mode.SUBTRACT)

    # F20_s55 → F20_t56 (revolve, cut)
    with BuildSketch(Plane(origin=(0, 0, 0), x_dir=(0, 1, 0), z_dir=(-0.4878228406, 0, 0.8729426535))):
        with BuildLine():
            ThreePointArc((-16.637, -29.21), (-16.0981846327, -28.9868153673), (-15.875, -28.448))
            Line((-15.875, -28.448), (-15.875, -29.21))
            Line((-15.875, -29.21), (-16.637, -29.21))
        make_face()
    revolve(axis=Axis((0, -15.875, 0), (0, 1, 0)), revolution_arc=F20_T56_ANGLE, mode=Mode.SUBTRACT)

    # F20_s57 → F20_t58 (revolve, cut)
    with BuildSketch(Plane(origin=(0, 0, 0), x_dir=(0, 1, 0), z_dir=(-0.9999019342, 0, 0.0140043543))):
        with BuildLine():
            ThreePointArc((-15.875, -28.448), (-16.0981846327, -28.9868153673), (-16.637, -29.21))
            Line((-16.637, -29.21), (-15.875, -29.21))
            Line((-15.875, -29.21), (-15.875, -28.448))
        make_face()
    revolve(axis=Axis((0, -15.875, 0), (0, 1, 0)), revolution_arc=F20_T58_ANGLE, mode=Mode.SUBTRACT)

    # F20_s59 → F20_t60 (revolve, cut)
    with BuildSketch(Plane(origin=(0, 0, 0), x_dir=(0, 1, 0), z_dir=(-0.5120790937, 0, -0.8589382992))):
        with BuildLine():
            ThreePointArc((-15.875, -28.448), (-16.0981846327, -28.9868153673), (-16.637, -29.21))
            Line((-16.637, -29.21), (-15.875, -29.21))
            Line((-15.875, -29.21), (-15.875, -28.448))
        make_face()
    revolve(axis=Axis((0, -15.875, 0), (0, 1, 0)), revolution_arc=F20_T60_ANGLE, mode=Mode.SUBTRACT)

    # F21 (on face) → F22 (join)
    with BuildSketch(Plane.XZ.offset(28.575)):
        with BuildLine():
            ThreePointArc((-3.6870200555, 32.5269122703), (13.8344986129, 29.6681780172), (27.2870312048, 18.0834749636))
            ThreePointArc((27.2870312048, 18.0834749636), (15.32595948, 32.8666261683), (-3.6870200555, 32.5269122703))
        make_face()
        with BuildLine():
            ThreePointArc((-27.2870312048, -18.0834749636), (-15.32595948, -32.8666261683), (3.6870200555, -32.5269122703))
            ThreePointArc((3.6870200555, -32.5269122703), (-13.8344986129, -29.6681780172), (-27.2870312048, -18.0834749636))
        make_face()
    extrude(amount=-F22_DEPTH)

    # F23 (on face) → F24 (join)
    with BuildSketch(Plane(origin=(0, -19.05, 0), x_dir=(-1, 0, 0), z_dir=(0, 1, 0))):
        with BuildLine():
            ThreePointArc((-2.9261285428, 32.567453848), (15.351083205, 28.8711884554), (28.6359131983, 15.7856185718))
            ThreePointArc((28.6359131983, 15.7856185718), (16.9965559886, 31.9658726674), (-2.9261285428, 32.567453848))
        make_face()
        with BuildLine():
            ThreePointArc((-28.6359131983, -15.7856185718), (-16.9965559886, -31.9658726674), (2.9261285428, -32.567453848))
            ThreePointArc((2.9261285428, -32.567453848), (-15.351083205, -28.8711884554), (-28.6359131983, -15.7856185718))
        make_face()
    extrude(amount=-F24_DEPTH)


solid = f1_6.part
